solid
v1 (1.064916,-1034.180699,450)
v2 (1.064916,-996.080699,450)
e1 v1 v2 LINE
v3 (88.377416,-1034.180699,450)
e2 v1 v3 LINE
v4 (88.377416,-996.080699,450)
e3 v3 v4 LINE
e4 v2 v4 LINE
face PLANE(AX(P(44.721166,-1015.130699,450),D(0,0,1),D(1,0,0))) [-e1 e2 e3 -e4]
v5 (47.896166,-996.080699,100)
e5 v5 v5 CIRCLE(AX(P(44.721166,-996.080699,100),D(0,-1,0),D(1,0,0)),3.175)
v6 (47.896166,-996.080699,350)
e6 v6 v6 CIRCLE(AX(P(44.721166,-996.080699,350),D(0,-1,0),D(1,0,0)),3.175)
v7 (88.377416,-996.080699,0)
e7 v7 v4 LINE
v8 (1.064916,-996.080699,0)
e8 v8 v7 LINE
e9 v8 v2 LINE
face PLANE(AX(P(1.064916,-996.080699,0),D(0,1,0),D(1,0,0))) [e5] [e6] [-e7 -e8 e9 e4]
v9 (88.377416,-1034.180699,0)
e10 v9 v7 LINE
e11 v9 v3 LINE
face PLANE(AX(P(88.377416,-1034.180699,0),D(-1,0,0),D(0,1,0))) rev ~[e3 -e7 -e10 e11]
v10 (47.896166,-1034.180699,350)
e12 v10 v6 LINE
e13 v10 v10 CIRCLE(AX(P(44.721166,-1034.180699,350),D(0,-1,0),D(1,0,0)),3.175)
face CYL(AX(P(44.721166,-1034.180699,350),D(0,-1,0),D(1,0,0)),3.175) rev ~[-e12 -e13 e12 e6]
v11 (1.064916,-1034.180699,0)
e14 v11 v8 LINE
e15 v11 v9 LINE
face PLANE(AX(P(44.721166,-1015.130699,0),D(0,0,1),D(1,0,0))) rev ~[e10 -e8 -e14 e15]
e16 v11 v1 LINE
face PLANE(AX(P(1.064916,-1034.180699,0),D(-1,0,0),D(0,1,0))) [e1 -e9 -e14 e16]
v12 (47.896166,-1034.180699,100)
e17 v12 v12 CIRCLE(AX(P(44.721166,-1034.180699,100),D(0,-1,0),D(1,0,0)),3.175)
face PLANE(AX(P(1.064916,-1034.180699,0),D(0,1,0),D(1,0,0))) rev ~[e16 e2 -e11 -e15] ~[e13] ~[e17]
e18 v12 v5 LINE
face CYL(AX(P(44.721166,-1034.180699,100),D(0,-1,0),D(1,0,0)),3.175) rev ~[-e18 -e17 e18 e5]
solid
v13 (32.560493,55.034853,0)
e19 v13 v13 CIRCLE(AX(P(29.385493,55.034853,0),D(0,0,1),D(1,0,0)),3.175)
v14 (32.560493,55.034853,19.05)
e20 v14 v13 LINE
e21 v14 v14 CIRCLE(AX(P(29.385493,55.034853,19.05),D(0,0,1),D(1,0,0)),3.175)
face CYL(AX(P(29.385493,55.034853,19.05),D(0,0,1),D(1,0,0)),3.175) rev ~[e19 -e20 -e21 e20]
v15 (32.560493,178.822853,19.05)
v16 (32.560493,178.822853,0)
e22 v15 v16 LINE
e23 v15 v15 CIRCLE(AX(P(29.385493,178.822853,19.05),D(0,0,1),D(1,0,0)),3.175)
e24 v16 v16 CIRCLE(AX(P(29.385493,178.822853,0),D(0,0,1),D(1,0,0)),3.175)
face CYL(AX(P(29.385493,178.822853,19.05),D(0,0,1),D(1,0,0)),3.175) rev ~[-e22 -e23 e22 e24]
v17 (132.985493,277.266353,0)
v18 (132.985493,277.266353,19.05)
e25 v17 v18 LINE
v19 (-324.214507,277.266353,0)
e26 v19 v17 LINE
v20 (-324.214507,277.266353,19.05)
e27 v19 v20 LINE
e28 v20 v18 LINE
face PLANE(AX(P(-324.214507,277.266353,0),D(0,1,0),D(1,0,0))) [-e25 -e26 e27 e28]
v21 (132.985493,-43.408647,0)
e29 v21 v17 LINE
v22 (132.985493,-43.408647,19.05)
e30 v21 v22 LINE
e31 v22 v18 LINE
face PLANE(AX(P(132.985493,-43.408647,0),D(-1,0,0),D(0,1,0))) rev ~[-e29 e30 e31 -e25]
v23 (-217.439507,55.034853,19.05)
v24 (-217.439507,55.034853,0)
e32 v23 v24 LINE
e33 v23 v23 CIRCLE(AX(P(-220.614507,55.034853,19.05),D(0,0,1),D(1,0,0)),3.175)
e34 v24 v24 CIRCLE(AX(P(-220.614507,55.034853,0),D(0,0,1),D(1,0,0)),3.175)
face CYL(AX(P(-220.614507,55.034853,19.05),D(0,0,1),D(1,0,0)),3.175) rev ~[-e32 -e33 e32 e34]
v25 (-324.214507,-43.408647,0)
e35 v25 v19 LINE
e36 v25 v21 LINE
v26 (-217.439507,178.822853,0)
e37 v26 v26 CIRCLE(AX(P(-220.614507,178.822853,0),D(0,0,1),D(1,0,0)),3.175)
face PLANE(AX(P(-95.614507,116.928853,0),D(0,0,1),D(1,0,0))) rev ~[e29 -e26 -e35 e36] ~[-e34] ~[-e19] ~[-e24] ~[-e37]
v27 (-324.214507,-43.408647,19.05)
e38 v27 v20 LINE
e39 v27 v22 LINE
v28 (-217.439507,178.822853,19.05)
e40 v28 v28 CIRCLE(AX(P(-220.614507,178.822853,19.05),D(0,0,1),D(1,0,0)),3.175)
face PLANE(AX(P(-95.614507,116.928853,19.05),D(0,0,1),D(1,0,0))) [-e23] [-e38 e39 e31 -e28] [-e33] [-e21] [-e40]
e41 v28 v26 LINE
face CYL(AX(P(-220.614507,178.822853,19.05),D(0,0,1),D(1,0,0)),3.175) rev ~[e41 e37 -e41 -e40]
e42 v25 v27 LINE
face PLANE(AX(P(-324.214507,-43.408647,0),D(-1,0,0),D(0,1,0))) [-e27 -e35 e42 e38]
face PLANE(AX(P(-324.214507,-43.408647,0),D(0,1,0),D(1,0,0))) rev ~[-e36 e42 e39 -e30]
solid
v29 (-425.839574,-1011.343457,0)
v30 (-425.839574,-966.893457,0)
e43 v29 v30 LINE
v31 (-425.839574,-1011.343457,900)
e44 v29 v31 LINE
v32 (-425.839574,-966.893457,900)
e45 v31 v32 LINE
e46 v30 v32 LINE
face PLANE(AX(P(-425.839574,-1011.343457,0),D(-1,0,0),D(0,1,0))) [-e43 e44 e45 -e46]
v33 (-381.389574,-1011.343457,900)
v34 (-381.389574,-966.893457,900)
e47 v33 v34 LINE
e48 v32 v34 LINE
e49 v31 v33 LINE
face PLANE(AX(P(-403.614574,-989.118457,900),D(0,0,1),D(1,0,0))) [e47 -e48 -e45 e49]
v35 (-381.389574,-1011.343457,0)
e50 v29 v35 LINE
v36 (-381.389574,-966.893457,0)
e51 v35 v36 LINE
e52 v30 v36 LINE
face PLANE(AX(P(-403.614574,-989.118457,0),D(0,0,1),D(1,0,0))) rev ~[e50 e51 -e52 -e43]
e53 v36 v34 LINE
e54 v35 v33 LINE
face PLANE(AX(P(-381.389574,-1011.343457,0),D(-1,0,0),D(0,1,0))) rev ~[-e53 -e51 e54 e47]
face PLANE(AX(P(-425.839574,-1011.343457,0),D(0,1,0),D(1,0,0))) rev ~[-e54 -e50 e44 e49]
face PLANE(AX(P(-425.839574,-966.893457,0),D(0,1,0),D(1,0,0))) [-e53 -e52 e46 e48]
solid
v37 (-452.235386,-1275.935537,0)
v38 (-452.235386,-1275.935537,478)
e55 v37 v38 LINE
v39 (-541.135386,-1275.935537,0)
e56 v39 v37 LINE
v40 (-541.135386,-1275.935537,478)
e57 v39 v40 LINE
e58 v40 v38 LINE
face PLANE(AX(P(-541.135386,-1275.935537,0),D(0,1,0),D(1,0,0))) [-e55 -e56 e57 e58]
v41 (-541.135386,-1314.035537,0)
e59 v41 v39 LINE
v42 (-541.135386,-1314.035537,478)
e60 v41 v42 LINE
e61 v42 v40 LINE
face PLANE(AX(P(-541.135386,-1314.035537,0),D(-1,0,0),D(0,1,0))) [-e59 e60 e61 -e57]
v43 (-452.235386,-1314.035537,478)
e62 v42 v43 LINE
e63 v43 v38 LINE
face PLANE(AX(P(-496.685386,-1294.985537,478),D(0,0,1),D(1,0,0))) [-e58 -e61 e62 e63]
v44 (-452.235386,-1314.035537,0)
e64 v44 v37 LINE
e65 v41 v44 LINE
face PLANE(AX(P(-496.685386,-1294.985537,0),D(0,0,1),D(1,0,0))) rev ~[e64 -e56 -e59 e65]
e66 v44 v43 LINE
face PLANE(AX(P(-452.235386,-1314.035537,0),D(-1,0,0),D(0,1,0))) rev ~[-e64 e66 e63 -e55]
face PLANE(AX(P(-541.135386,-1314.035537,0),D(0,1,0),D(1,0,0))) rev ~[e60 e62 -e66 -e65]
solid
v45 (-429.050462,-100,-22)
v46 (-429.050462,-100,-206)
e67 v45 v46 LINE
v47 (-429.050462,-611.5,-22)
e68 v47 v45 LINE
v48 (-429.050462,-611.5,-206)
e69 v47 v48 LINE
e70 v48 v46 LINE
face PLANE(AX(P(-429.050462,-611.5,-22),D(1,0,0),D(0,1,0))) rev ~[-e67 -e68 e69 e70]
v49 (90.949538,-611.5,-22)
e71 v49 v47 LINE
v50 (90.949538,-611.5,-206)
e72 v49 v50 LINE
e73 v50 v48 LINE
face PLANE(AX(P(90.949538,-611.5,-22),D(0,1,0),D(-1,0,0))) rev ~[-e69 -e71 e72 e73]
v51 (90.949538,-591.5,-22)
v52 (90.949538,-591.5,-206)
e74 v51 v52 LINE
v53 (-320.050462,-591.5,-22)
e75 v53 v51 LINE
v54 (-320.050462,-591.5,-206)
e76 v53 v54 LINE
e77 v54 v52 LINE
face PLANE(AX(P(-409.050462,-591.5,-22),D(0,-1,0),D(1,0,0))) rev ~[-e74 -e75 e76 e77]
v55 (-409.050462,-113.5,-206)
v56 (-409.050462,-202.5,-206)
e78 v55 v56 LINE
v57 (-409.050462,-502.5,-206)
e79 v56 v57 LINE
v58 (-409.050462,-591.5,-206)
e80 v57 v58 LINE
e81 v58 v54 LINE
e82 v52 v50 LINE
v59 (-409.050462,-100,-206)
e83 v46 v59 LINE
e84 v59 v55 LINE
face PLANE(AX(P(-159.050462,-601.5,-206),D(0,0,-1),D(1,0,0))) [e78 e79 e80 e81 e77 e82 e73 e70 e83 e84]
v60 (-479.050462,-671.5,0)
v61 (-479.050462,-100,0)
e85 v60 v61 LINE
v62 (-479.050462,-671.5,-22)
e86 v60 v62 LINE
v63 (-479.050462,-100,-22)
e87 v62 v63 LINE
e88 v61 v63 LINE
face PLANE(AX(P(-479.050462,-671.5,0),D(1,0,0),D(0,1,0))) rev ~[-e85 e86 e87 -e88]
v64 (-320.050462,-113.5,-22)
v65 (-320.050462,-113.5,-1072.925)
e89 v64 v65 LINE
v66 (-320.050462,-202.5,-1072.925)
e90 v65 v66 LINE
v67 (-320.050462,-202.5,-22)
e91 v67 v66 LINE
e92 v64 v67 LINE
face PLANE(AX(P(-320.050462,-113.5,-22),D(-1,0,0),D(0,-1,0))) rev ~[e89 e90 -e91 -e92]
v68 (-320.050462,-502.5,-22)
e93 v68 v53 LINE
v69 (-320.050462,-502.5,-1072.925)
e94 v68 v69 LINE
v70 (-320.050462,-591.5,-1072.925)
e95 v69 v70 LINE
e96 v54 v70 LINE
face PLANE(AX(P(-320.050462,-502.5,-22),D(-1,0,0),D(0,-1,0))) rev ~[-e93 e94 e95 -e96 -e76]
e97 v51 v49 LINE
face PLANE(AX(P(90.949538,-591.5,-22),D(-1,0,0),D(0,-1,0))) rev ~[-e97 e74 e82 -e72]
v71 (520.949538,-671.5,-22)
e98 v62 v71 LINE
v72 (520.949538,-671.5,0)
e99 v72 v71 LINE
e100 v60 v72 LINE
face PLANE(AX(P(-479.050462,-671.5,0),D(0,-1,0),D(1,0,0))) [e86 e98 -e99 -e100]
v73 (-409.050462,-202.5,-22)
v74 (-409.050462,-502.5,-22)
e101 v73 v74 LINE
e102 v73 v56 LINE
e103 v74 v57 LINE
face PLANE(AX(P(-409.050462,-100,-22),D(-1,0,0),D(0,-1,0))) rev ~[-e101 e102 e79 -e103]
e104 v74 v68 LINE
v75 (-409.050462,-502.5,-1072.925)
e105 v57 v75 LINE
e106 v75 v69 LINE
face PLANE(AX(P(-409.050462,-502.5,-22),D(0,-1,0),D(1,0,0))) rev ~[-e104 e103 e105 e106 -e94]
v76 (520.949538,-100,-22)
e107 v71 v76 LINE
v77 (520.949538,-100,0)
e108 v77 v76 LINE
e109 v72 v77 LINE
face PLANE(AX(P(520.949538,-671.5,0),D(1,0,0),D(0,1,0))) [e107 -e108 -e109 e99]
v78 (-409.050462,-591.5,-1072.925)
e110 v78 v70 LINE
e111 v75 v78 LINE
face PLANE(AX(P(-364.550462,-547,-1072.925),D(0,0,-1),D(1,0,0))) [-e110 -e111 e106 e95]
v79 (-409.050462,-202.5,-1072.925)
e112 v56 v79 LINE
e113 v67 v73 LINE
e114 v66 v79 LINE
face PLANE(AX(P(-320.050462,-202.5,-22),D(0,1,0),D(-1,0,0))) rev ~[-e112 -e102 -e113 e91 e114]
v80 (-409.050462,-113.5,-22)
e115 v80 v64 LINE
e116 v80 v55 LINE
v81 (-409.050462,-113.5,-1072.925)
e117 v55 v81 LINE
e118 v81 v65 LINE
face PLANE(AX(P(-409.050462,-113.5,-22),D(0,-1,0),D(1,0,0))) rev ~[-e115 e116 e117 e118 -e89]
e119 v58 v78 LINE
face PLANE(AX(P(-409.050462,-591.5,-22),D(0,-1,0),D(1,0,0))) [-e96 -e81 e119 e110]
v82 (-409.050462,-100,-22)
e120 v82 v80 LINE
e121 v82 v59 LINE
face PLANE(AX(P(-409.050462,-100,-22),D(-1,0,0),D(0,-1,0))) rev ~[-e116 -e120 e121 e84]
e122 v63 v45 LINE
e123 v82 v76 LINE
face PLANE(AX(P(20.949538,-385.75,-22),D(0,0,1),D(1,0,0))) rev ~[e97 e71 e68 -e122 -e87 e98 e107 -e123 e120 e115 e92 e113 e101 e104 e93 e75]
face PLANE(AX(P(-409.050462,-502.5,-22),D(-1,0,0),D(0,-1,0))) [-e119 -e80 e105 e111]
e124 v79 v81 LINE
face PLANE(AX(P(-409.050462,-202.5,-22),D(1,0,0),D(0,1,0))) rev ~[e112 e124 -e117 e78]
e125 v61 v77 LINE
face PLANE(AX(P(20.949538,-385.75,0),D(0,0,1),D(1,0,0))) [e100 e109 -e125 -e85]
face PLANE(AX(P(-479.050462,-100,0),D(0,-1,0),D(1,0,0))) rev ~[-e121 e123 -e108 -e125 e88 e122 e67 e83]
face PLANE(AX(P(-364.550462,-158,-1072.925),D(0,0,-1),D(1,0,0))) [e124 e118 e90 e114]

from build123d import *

# Parameters (mm, degrees)
F0_W      = 457.2
F0_H      = 320.675
F1_DEPTH  = 19.05
F2_W      = 1000
F2_H      = 571.5
F3_DEPTH  = 22
F5_DEPTH  = 184
F4_W      = 89
F4_H      = 89
F6_DEPTH  = 1050.925
F7_W      = 44.45
F7_H      = 44.45
F8_DEPTH  = 900
F9_W      = 87.3125
F9_H      = 38.1
F10_DEPTH = 450
F11_R     = 3.175
F12_DEPTH = 19.05
F13_R     = 3.175
F14_DEPTH = 38.1
F15_W     = 88.9
F15_H     = 38.1
F16_DEPTH = 478


# Not quite as in the source:
# - a feature names something its author has since deleted; it is built from what else it names


with BuildPart() as f1:
    # F0 (on Top) → F1 (new body)
    with BuildSketch(Plane.XY):
        with Locations((-95.6145071059, 116.9288526843)):
            Rectangle(F0_W, F0_H)
    extrude(amount=F1_DEPTH)

    # F11 (on face) → F12 (cut, through all)
    with BuildSketch(Plane.XY.offset(19.05)):
        with Locations((29.3854928941, 55.0348526843)):
            Circle(F11_R)
        with Locations((29.3854928941, 178.8228526843)):
            Circle(F11_R)
        with Locations((-220.6145071059, 55.0348526843)):
            Circle(F11_R)
        with Locations((-220.6145071059, 178.8228526843)):
            Circle(F11_R)
    extrude(amount=-F12_DEPTH, mode=Mode.SUBTRACT)


with BuildPart() as f3:
    # F2 (on Top) → F3 (new body)
    with BuildSketch(Plane.XY):
        with Locations((20.9495377159, -385.75)):
            Rectangle(F2_W, F2_H)
    extrude(amount=-F3_DEPTH)

    # F4 (on face) → F5 (join)
    with BuildSketch(Plane(origin=(0, 0, -22), x_dir=(1, 0, 0), z_dir=(0, 0, -1))):
        Polygon((90.9495377159, 611.5), (-409.0504622841, 611.5), (-409.0504622841, 591.5), (-320.0504622841, 591.5), (90.9495377159, 591.5), align=None)
        Polygon((-429.0504622841, 611.5), (-429.0504622841, 100), (-409.0504622841, 100), (-409.0504622841, 113.5), (-409.0504622841, 120), (-409.0504622841, 202.5), (-409.0504622841, 502.5), (-409.0504622841, 591.5), (-409.0504622841, 611.5), align=None)
    extrude(amount=F5_DEPTH)

    # F4 (on face) → F6 (join)
    with BuildSketch(Plane(origin=(0, 0, -22), x_dir=(1, 0, 0), z_dir=(0, 0, -1))):
        with Locations((-364.5504622841, 547)):
            Rectangle(F4_W, F4_H)
        Polygon((-409.0504622841, 120), (-409.0504622841, 113.5), (-320.0504622841, 113.5), (-320.0504622841, 202.5), (-409.0504622841, 202.5), align=None)
    extrude(amount=F6_DEPTH)


with BuildPart() as f8:
    # F7 (on Top) → F8 (new body)
    with BuildSketch(Plane.XY):
        with Locations((-403.6145740495, -989.1184568405)):
            Rectangle(F7_W, F7_H)
    extrude(amount=F8_DEPTH)


with BuildPart() as f10:
    # F9 (on Top) → F10 (new body)
    with BuildSketch(Plane.XY):
        with Locations((44.7211664671, -1015.1306986809)):
            Rectangle(F9_W, F9_H)
    extrude(amount=F10_DEPTH)

    # F13 (on face) → F14 (cut, through all)
    with BuildSketch(Plane.XZ.offset(1034.1806986809)):
        with Locations((44.7211664671, 350)):
            Circle(F13_R)
        with Locations((44.7211664671, 100)):
            Circle(F13_R)
    extrude(amount=-F14_DEPTH, mode=Mode.SUBTRACT)


with BuildPart() as f16:
    # F15 (on Top) → F16 (new body)
    with BuildSketch(Plane.XY):
        with Locations((-496.685385704, -1294.9855373636)):
            Rectangle(F15_W, F15_H)
    extrude(amount=F16_DEPTH)


solid = Compound([f1.part, f3.part, f8.part, f10.part, f16.part])
